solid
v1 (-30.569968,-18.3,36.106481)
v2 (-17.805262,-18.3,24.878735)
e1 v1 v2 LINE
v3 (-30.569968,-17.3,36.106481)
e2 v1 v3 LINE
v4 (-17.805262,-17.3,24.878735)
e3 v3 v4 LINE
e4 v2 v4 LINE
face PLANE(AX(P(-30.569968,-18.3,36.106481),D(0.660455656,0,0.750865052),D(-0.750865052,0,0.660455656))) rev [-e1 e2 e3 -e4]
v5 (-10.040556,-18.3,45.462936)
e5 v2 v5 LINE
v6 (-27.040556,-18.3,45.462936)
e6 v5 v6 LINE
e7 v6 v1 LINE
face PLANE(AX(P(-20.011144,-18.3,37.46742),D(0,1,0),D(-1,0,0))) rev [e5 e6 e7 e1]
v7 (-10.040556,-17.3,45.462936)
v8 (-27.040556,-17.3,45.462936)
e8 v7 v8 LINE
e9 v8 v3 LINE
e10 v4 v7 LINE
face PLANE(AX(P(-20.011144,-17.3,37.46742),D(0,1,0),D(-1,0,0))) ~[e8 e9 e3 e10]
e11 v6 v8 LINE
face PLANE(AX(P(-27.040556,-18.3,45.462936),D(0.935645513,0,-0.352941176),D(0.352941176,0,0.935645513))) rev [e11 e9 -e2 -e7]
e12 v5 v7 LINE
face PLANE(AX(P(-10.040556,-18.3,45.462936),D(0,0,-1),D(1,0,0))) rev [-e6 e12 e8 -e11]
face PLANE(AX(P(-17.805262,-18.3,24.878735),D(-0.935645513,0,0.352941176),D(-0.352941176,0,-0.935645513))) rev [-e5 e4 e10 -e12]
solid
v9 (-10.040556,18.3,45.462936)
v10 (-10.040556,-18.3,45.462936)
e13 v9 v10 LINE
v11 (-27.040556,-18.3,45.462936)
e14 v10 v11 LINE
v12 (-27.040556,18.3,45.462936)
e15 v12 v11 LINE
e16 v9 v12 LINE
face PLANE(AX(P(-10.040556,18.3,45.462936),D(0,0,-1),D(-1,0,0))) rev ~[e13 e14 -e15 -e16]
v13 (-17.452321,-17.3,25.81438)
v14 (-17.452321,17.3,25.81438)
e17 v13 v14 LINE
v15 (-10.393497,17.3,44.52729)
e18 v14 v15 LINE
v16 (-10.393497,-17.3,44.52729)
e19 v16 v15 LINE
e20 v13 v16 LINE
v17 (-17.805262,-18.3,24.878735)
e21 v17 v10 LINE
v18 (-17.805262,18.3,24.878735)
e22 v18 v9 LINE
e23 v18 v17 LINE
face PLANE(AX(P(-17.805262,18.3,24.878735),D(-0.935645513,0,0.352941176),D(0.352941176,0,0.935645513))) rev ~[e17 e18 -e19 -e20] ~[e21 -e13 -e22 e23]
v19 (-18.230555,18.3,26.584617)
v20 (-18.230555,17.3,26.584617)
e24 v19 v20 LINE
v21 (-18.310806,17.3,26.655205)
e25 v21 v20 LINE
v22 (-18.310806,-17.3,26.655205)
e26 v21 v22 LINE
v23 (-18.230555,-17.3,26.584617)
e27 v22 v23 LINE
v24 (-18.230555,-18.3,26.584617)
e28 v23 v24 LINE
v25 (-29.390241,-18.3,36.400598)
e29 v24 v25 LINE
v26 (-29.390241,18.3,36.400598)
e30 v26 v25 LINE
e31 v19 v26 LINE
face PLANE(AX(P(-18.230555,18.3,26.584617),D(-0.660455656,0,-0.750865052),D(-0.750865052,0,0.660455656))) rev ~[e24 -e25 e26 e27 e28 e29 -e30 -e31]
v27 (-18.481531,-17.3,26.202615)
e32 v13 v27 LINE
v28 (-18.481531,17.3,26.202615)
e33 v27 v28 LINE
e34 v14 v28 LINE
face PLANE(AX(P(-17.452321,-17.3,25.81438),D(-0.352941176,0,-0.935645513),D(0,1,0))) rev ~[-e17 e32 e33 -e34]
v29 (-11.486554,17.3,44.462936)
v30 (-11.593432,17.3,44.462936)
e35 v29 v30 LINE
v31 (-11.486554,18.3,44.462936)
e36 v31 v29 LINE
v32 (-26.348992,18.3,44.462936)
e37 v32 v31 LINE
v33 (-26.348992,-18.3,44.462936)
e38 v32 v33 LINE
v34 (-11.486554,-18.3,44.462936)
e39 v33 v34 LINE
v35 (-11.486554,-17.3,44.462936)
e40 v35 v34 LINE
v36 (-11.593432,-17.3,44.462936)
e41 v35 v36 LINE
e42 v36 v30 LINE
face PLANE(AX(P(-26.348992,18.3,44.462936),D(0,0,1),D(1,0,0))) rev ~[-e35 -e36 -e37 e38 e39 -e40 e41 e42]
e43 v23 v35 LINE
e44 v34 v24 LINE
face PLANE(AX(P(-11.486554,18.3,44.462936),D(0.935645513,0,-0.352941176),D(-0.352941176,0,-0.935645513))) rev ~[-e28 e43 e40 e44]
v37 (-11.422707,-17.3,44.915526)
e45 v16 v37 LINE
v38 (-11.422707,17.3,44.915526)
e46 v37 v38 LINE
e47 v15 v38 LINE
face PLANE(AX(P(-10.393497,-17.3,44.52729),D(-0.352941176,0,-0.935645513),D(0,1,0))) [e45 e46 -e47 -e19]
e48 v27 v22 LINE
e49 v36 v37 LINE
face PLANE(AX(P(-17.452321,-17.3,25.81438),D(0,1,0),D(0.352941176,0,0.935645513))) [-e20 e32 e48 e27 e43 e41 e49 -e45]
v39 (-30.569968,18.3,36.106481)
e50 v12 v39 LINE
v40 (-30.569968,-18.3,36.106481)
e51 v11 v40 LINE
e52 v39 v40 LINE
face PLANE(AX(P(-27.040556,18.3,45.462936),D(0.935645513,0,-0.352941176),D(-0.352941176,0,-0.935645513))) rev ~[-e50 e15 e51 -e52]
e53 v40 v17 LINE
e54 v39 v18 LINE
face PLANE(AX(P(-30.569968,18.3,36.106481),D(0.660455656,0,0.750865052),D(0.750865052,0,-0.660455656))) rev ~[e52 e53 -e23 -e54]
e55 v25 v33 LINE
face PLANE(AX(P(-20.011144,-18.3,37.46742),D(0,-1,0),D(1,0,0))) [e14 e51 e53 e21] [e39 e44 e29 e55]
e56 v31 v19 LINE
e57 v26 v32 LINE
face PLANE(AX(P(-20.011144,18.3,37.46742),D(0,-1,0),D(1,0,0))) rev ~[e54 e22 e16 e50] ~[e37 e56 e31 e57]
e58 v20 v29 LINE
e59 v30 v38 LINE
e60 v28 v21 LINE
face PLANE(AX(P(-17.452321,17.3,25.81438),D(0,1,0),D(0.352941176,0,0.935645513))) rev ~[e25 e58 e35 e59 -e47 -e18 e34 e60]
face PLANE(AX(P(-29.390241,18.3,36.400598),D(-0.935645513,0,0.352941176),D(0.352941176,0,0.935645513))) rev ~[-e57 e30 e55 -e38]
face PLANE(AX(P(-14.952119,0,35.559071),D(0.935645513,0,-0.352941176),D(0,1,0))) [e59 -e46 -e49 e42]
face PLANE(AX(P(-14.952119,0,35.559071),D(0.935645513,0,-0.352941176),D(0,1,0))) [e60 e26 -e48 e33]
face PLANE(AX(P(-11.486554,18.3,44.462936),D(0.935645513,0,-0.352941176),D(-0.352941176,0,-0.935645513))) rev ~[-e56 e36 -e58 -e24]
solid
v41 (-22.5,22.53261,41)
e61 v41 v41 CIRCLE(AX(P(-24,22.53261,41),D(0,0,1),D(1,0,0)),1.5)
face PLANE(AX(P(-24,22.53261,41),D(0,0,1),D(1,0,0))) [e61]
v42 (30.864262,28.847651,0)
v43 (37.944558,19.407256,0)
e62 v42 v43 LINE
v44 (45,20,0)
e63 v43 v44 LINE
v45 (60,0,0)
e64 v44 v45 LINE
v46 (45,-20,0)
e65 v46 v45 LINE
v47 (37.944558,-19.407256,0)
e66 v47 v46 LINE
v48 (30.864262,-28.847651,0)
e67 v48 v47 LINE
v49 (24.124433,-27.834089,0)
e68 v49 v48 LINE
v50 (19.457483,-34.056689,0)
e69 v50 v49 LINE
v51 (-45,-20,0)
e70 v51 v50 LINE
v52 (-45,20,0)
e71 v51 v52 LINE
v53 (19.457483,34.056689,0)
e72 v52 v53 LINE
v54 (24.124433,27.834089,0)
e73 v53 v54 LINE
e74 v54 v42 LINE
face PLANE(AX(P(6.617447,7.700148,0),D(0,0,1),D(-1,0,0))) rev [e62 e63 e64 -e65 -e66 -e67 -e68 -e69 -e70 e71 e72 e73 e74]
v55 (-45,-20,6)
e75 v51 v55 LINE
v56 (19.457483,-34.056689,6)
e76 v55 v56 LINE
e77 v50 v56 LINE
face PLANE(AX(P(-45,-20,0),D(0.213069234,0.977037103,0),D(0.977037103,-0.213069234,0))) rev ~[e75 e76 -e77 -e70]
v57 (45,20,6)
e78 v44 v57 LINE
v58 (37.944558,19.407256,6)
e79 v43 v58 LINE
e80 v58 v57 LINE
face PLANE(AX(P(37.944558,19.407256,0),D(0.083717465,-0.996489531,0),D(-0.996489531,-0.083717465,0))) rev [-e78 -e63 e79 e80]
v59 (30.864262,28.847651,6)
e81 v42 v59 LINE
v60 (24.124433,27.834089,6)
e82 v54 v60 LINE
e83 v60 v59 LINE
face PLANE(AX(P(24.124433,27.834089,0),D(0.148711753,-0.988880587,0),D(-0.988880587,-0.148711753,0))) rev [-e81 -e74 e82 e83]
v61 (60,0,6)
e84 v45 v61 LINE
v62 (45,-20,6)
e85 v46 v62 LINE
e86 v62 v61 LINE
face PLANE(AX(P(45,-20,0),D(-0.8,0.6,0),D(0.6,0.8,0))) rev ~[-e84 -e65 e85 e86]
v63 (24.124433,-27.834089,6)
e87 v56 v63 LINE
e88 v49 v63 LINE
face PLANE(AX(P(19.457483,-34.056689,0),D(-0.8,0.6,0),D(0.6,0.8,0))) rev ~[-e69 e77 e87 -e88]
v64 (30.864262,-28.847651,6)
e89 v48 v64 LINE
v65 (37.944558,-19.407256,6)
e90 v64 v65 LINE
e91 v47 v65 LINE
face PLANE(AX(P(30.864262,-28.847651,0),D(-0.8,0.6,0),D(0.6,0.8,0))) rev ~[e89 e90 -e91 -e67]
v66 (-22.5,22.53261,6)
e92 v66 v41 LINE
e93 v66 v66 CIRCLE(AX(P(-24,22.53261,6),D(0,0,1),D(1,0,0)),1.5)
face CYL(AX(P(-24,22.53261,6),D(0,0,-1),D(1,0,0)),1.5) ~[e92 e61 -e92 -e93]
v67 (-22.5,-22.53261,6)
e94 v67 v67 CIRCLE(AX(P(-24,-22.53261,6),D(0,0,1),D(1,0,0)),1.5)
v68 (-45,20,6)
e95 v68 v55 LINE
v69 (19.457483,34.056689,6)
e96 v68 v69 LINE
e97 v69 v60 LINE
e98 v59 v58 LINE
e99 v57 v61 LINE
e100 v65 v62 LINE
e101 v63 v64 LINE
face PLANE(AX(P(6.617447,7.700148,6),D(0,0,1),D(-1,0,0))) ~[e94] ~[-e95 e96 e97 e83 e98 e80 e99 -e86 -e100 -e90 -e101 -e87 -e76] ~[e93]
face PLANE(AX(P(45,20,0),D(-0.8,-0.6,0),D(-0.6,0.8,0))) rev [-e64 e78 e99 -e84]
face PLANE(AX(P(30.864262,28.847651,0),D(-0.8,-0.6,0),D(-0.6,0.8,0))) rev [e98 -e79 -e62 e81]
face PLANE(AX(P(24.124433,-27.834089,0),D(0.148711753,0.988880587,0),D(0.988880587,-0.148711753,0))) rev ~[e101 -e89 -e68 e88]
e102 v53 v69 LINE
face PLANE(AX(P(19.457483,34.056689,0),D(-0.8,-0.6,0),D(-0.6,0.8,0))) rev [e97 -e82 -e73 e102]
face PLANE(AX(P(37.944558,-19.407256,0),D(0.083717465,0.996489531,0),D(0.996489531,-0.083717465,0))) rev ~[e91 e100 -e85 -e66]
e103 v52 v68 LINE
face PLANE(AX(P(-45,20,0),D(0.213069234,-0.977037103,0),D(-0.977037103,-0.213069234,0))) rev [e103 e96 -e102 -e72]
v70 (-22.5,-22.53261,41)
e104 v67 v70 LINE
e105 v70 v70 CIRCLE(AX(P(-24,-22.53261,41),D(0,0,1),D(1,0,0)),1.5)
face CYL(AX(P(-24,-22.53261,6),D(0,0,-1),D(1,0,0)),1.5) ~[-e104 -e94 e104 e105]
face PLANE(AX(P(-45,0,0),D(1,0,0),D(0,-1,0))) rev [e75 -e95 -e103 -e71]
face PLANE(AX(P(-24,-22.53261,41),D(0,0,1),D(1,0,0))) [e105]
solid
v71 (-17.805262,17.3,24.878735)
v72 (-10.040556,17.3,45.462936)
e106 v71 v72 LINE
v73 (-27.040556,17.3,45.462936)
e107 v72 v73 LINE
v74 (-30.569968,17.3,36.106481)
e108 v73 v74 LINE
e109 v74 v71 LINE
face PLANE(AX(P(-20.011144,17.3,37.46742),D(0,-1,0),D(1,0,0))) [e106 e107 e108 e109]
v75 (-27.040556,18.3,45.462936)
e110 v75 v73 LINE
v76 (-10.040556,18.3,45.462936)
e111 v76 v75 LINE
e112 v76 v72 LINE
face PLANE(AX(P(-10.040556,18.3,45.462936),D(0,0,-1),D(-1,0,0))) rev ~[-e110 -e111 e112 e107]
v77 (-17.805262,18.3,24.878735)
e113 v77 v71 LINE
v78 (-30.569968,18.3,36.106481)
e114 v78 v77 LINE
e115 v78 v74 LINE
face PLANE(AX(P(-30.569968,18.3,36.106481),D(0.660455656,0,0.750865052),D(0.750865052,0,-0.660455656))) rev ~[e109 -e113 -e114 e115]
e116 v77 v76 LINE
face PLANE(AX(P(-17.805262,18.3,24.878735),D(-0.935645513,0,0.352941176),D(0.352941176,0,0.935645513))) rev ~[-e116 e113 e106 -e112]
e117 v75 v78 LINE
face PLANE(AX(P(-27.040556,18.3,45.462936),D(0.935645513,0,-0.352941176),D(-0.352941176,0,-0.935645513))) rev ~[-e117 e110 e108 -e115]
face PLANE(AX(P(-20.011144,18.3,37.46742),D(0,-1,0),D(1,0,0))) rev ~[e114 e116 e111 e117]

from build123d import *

# Parameters (mm, degrees)
F1_DEPTH  = 6
F4_R      = 1.5
F5_DEPTH  = 35
F12_DEPTH = 1
F14_DEPTH = 36.6
F15_W     = 34.6
F15_H     = 20
F16_DEPTH = 1.1
F17_DEPTH = 39.7
F18_DEPTH = 40.4


# Not quite as in the source:
# - a feature of the source that left no trace in its solid (it failed there, or was rolled back) is left out
# - the program builds the solid bodies; features that only make, move or delete a surface that nothing else refers to are left out


with BuildPart() as f1:
    # F0 (on Top) → F1 (new body)
    with BuildSketch(Plane.XY):
        Polygon((37.9445583731, -19.4072555025), (45, -20), (60, 0), (-45, 0), (-45, -12.4388851051), align=None)
        Polygon((30.8642615863, -28.8476512183), (37.9445583731, -19.4072555025), (-45, -12.4388851051), (-45, -17.4388851051), (24.1244330356, -27.8340892858), align=None)
        Polygon((24.1244330356, -27.8340892858), (-45, -17.4388851051), (-45, -20), (19.4574833105, -34.0566889193), align=None)
    extrude(amount=F1_DEPTH)

    # F2: F1 across plane


with BuildPart() as f1_1:
    add(f1.part)
    add(f1.part.mirror(Plane.XZ))

    # F4 (on face) → F5 (join)
    with BuildSketch(Plane.XY.offset(6)):
        with Locations((-24, -22.5326099851)):
            Circle(F4_R)
        with Locations((-24, 22.5326099851)):
            Circle(F4_R)
    extrude(amount=F5_DEPTH)

    # F17 (add): a face of the model
    f17_faces = [f1_1.faces().sort_by_distance(p)[0] for p in [
        (-24, -22.5326099851, 41),
    ]]
    extrude(f17_faces, amount=-F17_DEPTH)

    # F18 (add): a face of the model
    f18_faces = [f1_1.faces().sort_by_distance(p)[0] for p in [
        (-24, 22.5326099851, 41),
    ]]
    extrude(f18_faces, amount=-F18_DEPTH)


with BuildPart() as f12:
    # F11 (on offset) → F12 (new body)
    with BuildSketch(Plane.XZ.offset(-18.3)):
        Polygon((-10.0405558896, 45.4629359559), (-27.0405558896, 45.4629359559), (-30.5699676544, 36.1064808262), (-17.805261772, 24.8787346705), align=None)
        Polygon((-29.3902407032, 36.4005984732), (-26.3489918148, 44.4629359559), (-11.4865535006, 44.4629359559), (-18.230555187, 26.5846170234), align=None, mode=Mode.SUBTRACT)
        Polygon((-11.4865535006, 44.4629359559), (-26.3489918148, 44.4629359559), (-29.3902407032, 36.4005984732), (-18.230555187, 26.5846170234), align=None)
    extrude(amount=F12_DEPTH)


with BuildPart() as f13_1:
    # F13: instance of F12
    add(f12.part.mirror(Plane.XZ))


with BuildPart() as f14:
    # F11 (on offset) → F14 (new body, through all)
    with BuildSketch(Plane.XZ.offset(-18.3)):
        Polygon((-10.0405558896, 45.4629359559), (-27.0405558896, 45.4629359559), (-30.5699676544, 36.1064808262), (-17.805261772, 24.8787346705), align=None)
        Polygon((-29.3902407032, 36.4005984732), (-26.3489918148, 44.4629359559), (-11.4865535006, 44.4629359559), (-18.230555187, 26.5846170234), align=None, mode=Mode.SUBTRACT)
    extrude(amount=F14_DEPTH)

    # F15 (on face) → F16 (cut)
    with BuildSketch(Plane(origin=(-23.8029558046, 0, 8.9788740593), x_dir=(0, 1, 0), z_dir=(0.935645513, 0, -0.3529411765))):
        with Locations((0, 27.9934664258)):
            Rectangle(F15_W, F15_H)
    extrude(amount=-F16_DEPTH, mode=Mode.SUBTRACT)


solid = Compound([f1_1.part, f12.part, f13_1.part, f14.part])
